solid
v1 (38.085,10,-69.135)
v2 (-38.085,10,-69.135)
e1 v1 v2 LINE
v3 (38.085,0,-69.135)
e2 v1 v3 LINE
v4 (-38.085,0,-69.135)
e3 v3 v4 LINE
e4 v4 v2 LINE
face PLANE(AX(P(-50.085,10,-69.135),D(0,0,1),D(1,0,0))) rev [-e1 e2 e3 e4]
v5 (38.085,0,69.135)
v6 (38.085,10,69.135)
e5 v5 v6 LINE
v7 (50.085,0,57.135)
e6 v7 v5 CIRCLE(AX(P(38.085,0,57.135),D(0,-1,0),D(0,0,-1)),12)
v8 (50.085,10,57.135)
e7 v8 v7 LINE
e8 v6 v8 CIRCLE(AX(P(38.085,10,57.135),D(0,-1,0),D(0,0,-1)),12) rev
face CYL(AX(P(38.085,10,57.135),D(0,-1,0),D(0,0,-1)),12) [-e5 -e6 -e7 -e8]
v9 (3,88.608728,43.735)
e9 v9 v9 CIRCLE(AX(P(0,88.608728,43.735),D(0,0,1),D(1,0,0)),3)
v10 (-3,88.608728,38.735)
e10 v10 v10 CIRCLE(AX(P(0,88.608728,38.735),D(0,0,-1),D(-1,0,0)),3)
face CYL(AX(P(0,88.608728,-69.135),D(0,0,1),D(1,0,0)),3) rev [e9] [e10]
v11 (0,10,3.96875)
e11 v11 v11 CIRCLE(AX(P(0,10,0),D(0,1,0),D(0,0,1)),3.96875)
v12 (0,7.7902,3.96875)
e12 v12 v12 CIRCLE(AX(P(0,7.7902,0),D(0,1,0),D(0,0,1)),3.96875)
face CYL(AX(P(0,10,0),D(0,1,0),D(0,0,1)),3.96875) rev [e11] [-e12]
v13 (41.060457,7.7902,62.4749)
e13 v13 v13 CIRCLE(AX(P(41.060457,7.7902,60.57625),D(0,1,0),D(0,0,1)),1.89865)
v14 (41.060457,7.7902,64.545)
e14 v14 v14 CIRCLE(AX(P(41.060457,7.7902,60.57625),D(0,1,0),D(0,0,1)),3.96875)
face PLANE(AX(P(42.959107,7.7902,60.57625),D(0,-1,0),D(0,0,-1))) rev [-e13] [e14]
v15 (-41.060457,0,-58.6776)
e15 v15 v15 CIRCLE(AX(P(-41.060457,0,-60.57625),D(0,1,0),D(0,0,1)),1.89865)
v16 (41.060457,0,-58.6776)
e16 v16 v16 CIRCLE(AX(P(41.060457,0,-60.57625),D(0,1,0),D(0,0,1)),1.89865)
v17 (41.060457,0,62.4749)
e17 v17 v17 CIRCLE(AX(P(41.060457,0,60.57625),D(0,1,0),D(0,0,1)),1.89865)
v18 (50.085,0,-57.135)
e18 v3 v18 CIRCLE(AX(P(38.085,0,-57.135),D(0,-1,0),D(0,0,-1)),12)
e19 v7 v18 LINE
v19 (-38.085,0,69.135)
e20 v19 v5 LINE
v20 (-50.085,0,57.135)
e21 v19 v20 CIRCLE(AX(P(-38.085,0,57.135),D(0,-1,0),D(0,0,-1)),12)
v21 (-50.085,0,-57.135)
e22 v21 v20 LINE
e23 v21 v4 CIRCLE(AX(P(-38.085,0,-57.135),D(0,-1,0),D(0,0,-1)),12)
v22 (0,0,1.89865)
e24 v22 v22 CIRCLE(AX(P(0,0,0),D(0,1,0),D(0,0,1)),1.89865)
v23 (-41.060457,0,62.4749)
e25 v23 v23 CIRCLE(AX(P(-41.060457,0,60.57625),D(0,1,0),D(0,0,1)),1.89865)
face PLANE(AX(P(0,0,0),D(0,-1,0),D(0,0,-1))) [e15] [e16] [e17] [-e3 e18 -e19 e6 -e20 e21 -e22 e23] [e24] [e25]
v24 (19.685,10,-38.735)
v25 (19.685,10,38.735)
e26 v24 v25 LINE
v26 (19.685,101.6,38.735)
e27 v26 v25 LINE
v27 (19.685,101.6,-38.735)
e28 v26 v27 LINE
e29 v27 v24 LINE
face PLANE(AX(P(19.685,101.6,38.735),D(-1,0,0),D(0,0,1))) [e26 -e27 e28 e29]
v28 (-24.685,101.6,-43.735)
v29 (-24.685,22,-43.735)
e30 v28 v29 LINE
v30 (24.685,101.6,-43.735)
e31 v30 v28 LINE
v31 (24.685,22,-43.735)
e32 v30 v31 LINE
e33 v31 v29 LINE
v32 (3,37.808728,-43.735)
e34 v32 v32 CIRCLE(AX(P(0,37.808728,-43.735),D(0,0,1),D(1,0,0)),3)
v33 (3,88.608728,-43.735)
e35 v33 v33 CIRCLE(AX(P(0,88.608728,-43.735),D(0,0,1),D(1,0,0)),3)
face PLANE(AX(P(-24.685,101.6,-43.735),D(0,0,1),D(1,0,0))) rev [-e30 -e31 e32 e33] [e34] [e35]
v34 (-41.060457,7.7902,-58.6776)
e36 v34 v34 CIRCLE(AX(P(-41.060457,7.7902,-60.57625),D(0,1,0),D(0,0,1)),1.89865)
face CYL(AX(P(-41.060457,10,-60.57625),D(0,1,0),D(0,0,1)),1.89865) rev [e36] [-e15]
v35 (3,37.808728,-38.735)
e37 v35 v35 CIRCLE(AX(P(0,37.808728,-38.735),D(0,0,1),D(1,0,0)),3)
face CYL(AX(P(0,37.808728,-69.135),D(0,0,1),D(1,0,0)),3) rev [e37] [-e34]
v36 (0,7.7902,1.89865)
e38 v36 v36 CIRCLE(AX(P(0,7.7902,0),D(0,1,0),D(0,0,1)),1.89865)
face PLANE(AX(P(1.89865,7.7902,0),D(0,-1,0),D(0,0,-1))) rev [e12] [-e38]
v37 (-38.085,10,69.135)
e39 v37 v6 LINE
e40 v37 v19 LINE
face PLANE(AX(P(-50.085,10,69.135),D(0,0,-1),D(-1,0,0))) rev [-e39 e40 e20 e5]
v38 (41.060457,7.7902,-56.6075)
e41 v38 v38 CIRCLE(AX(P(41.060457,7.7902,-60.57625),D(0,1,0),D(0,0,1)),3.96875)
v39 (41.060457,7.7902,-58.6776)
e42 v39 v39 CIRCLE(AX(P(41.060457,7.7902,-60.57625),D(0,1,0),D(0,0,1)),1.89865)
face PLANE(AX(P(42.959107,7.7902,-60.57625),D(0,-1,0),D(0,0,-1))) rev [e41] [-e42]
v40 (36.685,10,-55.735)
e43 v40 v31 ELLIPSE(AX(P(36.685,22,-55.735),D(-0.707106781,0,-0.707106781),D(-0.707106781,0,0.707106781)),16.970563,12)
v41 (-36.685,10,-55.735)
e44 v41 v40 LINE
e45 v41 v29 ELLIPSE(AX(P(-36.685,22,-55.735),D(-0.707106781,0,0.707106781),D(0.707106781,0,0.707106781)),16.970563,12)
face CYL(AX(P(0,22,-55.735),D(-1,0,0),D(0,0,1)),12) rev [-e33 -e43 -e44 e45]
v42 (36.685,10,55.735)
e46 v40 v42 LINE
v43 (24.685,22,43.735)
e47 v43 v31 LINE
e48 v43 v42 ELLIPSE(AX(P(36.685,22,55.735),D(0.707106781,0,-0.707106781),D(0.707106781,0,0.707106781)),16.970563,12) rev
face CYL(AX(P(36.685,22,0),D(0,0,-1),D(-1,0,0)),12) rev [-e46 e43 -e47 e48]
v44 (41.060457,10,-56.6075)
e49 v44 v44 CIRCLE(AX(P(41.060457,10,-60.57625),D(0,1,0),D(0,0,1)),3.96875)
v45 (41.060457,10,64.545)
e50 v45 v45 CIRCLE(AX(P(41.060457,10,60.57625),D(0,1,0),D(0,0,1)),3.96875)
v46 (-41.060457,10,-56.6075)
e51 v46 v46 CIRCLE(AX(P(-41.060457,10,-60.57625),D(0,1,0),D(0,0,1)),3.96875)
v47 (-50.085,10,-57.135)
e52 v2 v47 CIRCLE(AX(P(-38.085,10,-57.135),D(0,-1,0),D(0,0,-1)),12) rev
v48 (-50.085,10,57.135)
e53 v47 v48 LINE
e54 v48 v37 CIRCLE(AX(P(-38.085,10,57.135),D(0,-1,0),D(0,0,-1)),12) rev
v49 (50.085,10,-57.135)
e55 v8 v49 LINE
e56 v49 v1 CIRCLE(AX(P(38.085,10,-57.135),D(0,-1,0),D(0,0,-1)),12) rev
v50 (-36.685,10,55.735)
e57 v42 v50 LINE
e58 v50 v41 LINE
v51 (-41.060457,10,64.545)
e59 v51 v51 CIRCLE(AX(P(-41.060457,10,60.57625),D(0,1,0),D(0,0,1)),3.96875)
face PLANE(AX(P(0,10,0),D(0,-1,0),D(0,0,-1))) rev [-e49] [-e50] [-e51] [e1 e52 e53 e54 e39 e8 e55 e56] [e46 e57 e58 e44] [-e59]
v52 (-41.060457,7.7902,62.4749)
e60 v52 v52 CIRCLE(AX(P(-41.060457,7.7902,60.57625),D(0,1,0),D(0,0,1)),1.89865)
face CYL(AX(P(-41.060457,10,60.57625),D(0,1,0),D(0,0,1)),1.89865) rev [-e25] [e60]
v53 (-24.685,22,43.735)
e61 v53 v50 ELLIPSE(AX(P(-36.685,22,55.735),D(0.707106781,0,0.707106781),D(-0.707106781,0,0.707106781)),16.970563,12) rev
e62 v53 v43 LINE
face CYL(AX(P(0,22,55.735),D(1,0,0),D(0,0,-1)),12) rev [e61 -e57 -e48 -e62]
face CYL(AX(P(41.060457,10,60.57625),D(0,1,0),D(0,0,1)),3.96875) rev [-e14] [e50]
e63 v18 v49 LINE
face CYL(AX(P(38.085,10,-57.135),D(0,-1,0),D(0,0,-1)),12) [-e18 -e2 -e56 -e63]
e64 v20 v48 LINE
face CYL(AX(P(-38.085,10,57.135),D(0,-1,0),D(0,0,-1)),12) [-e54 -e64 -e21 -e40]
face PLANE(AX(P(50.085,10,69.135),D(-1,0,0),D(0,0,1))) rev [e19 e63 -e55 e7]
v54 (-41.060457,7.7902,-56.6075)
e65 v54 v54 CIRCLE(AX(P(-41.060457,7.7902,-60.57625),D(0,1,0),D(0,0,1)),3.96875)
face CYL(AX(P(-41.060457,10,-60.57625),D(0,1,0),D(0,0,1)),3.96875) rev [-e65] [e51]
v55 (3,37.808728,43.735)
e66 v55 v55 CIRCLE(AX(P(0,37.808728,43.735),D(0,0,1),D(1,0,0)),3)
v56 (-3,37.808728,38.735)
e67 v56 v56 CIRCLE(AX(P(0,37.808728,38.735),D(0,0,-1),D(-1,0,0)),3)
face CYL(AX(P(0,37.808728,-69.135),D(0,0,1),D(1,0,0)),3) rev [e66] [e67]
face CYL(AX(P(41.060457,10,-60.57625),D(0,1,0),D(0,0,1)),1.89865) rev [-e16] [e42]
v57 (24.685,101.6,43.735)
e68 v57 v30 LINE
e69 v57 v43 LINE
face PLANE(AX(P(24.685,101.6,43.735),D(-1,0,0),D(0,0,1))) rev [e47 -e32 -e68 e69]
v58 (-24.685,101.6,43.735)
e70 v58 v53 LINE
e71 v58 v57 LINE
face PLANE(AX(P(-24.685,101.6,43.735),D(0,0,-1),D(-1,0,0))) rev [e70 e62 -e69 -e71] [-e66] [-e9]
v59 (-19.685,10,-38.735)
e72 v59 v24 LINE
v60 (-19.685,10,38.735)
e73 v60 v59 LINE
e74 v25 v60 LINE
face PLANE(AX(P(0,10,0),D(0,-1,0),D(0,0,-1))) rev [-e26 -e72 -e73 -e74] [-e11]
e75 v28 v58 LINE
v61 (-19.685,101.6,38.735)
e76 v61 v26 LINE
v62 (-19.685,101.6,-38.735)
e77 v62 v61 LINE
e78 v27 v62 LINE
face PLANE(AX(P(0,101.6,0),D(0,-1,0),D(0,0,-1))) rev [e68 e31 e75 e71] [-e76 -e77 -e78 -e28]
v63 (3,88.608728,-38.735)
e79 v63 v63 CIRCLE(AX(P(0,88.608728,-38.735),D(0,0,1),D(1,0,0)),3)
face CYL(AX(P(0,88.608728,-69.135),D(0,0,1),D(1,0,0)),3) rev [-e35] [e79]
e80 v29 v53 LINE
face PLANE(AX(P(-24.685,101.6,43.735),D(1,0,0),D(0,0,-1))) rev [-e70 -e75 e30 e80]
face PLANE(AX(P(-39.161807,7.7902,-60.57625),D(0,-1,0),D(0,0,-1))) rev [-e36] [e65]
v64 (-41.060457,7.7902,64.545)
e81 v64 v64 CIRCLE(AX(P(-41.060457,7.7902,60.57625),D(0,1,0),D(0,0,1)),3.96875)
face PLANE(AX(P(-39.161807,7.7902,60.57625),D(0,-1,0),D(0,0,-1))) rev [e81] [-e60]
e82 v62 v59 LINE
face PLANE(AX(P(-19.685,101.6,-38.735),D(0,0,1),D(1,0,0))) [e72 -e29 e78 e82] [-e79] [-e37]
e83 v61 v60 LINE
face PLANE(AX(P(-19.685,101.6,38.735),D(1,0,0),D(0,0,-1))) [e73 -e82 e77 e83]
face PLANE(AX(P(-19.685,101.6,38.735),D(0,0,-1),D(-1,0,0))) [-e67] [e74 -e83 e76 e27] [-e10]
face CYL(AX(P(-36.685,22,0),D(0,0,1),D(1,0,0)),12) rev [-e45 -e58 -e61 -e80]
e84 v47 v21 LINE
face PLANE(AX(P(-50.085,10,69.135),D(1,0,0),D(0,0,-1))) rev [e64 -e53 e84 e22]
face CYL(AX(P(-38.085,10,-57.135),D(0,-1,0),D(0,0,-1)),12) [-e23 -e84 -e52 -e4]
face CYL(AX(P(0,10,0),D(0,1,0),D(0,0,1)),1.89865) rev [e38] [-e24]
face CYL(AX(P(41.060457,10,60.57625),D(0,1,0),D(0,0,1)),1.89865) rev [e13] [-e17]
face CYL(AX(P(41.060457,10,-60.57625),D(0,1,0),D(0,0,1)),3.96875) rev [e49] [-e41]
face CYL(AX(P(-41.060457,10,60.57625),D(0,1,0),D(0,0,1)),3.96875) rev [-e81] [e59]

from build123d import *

# Parameters (mm, degrees)
SKETCH1_W                                     = 49.37
SKETCH1_H                                     = 87.47
SKETCH1_W_2                                   = 39.37
SKETCH1_H_2                                   = 77.47
BOSS_EXTRUDE1_DEPTH                           = 101.6
SKETCH2_W                                     = 100.17
SKETCH2_H                                     = 138.27
BOSS_EXTRUDE2_DEPTH                           = 10
FILLET1_R                                     = 12
CBORE_FOR_6_BINDING_HEAD_MACHINE_SC_2_R       = 1.89865
CBORE_FOR_6_BINDING_HEAD_MACHINE_SCREW2_DEPTH = 10
CBORE_START                                   = 7.7902
CBORE_FOR_6_BINDING_HEAD_MACHINE_SC_3_O_R     = 3.96875
CBORE_FOR_6_BINDING_HEAD_MACHINE_SC_3_O_R_2   = 1.89865
CBORE_FOR_6_BINDING_HEAD_MACHINE_SC_3_DEPTH   = 2.2098
FILLET2_R                                     = 12
SKETCH9_R                                     = 3
CUT_EXTRUDE1_DEPTH                            = 160.908424184


# Read off the part's stored shape, not the designer's step: CBORE for #6 Binding Head Machine Screw2
with BuildPart() as part:
    # Sketch1 → Boss-Extrude1 (new body)
    with BuildSketch(Plane(origin=(0, 0, 0), x_dir=(1, 0, 0), z_dir=(0, 1, 0))):
        Rectangle(SKETCH1_W, SKETCH1_H)
        Rectangle(SKETCH1_W_2, SKETCH1_H_2, mode=Mode.SUBTRACT)
    extrude(amount=BOSS_EXTRUDE1_DEPTH)

    # Sketch2 → Boss-Extrude2 (add)
    with BuildSketch(Plane(origin=(0, 0, 0), x_dir=(1, 0, 0), z_dir=(0, 1, 0))):
        Rectangle(SKETCH2_W, SKETCH2_H)
    extrude(amount=BOSS_EXTRUDE2_DEPTH)

    # Fillet1
    fillet1_edges = [part.edges().sort_by_distance(p)[0] for p in [
        (0, 10, -43.735),
        (24.685, 10, 0),
        (0, 10, 43.735),
        (-24.685, 10, 0),
    ]]
    fillet(fillet1_edges, radius=FILLET1_R)

    # CBORE for _6 Binding Head Machine Sc 2 → CBORE for #6 Binding Head Machine Screw2 (cut)
    with BuildSketch(Plane(origin=(0, 0, 0), x_dir=(1, 0, 0), z_dir=(0, 1, 0))):
        with Locations((41.060456563, -60.576250035)):
            Circle(CBORE_FOR_6_BINDING_HEAD_MACHINE_SC_2_R)
        with Locations((-41.060456563, 60.576250035)):
            Circle(CBORE_FOR_6_BINDING_HEAD_MACHINE_SC_2_R)
        with Locations((-41.060456563, -60.576250035)):
            Circle(CBORE_FOR_6_BINDING_HEAD_MACHINE_SC_2_R)
        with Locations((41.060456563, 60.576250035)):
            Circle(CBORE_FOR_6_BINDING_HEAD_MACHINE_SC_2_R)
        Circle(CBORE_FOR_6_BINDING_HEAD_MACHINE_SC_2_R)
    extrude(amount=CBORE_FOR_6_BINDING_HEAD_MACHINE_SCREW2_DEPTH, mode=Mode.SUBTRACT)

    # CBORE for _6 Binding Head Machine Sc 3 o → CBORE for _6 Binding Head Machine Sc 3 (cut)
    # profile 1 of 5: a face of its own
    with BuildSketch(Plane(origin=(0, 0, 0), x_dir=(1, 0, 0), z_dir=(0, 1, 0)).offset(CBORE_START)):
        with Locations((41.060456563, -60.576250035)):
            Circle(CBORE_FOR_6_BINDING_HEAD_MACHINE_SC_3_O_R)
        with Locations((41.060456563, -60.576250035)):
            Circle(CBORE_FOR_6_BINDING_HEAD_MACHINE_SC_3_O_R_2, mode=Mode.SUBTRACT)
    # profile 2 of 5: a face of its own
    with BuildSketch(Plane(origin=(0, 0, 0), x_dir=(1, 0, 0), z_dir=(0, 1, 0)).offset(CBORE_START)):
        with Locations((-41.060456563, 60.576250035)):
            Circle(CBORE_FOR_6_BINDING_HEAD_MACHINE_SC_3_O_R)
        with Locations((-41.060456563, 60.576250035)):
            Circle(CBORE_FOR_6_BINDING_HEAD_MACHINE_SC_3_O_R_2, mode=Mode.SUBTRACT)
    # profile 3 of 5: a face of its own
    with BuildSketch(Plane(origin=(0, 0, 0), x_dir=(1, 0, 0), z_dir=(0, 1, 0)).offset(CBORE_START)):
        with Locations((-41.060456563, -60.576250035)):
            Circle(CBORE_FOR_6_BINDING_HEAD_MACHINE_SC_3_O_R)
        with Locations((-41.060456563, -60.576250035)):
            Circle(CBORE_FOR_6_BINDING_HEAD_MACHINE_SC_3_O_R_2, mode=Mode.SUBTRACT)
    # profile 4 of 5: a face of its own
    with BuildSketch(Plane(origin=(0, 0, 0), x_dir=(1, 0, 0), z_dir=(0, 1, 0)).offset(CBORE_START)):
        with Locations((41.060456563, 60.576250035)):
            Circle(CBORE_FOR_6_BINDING_HEAD_MACHINE_SC_3_O_R)
        with Locations((41.060456563, 60.576250035)):
            Circle(CBORE_FOR_6_BINDING_HEAD_MACHINE_SC_3_O_R_2, mode=Mode.SUBTRACT)
    # profile 5 of 5: a face of its own
    with BuildSketch(Plane(origin=(0, 0, 0), x_dir=(1, 0, 0), z_dir=(0, 1, 0)).offset(CBORE_START)):
        Circle(CBORE_FOR_6_BINDING_HEAD_MACHINE_SC_3_O_R)
        Circle(CBORE_FOR_6_BINDING_HEAD_MACHINE_SC_3_O_R_2, mode=Mode.SUBTRACT)
    extrude(amount=CBORE_FOR_6_BINDING_HEAD_MACHINE_SC_3_DEPTH, mode=Mode.SUBTRACT)

    # Fillet2
    fillet2_edges = [part.edges().sort_by_distance(p)[0] for p in [
        (50.085, 5, 69.135),
        (50.085, 5, -69.135),
        (-50.085, 5, -69.135),
        (-50.085, 5, 69.135),
    ]]
    fillet(fillet2_edges, radius=FILLET2_R)

    # Sketch9 → Cut-Extrude1 (cut, through all)
    with BuildSketch(Plane.XY.offset(43.735)):
        with Locations((0, 88.608727906)):
            Circle(SKETCH9_R)
        with Locations((0, 37.808727906)):
            Circle(SKETCH9_R)
    extrude(amount=-CUT_EXTRUDE1_DEPTH, mode=Mode.SUBTRACT)


solid = part.part
